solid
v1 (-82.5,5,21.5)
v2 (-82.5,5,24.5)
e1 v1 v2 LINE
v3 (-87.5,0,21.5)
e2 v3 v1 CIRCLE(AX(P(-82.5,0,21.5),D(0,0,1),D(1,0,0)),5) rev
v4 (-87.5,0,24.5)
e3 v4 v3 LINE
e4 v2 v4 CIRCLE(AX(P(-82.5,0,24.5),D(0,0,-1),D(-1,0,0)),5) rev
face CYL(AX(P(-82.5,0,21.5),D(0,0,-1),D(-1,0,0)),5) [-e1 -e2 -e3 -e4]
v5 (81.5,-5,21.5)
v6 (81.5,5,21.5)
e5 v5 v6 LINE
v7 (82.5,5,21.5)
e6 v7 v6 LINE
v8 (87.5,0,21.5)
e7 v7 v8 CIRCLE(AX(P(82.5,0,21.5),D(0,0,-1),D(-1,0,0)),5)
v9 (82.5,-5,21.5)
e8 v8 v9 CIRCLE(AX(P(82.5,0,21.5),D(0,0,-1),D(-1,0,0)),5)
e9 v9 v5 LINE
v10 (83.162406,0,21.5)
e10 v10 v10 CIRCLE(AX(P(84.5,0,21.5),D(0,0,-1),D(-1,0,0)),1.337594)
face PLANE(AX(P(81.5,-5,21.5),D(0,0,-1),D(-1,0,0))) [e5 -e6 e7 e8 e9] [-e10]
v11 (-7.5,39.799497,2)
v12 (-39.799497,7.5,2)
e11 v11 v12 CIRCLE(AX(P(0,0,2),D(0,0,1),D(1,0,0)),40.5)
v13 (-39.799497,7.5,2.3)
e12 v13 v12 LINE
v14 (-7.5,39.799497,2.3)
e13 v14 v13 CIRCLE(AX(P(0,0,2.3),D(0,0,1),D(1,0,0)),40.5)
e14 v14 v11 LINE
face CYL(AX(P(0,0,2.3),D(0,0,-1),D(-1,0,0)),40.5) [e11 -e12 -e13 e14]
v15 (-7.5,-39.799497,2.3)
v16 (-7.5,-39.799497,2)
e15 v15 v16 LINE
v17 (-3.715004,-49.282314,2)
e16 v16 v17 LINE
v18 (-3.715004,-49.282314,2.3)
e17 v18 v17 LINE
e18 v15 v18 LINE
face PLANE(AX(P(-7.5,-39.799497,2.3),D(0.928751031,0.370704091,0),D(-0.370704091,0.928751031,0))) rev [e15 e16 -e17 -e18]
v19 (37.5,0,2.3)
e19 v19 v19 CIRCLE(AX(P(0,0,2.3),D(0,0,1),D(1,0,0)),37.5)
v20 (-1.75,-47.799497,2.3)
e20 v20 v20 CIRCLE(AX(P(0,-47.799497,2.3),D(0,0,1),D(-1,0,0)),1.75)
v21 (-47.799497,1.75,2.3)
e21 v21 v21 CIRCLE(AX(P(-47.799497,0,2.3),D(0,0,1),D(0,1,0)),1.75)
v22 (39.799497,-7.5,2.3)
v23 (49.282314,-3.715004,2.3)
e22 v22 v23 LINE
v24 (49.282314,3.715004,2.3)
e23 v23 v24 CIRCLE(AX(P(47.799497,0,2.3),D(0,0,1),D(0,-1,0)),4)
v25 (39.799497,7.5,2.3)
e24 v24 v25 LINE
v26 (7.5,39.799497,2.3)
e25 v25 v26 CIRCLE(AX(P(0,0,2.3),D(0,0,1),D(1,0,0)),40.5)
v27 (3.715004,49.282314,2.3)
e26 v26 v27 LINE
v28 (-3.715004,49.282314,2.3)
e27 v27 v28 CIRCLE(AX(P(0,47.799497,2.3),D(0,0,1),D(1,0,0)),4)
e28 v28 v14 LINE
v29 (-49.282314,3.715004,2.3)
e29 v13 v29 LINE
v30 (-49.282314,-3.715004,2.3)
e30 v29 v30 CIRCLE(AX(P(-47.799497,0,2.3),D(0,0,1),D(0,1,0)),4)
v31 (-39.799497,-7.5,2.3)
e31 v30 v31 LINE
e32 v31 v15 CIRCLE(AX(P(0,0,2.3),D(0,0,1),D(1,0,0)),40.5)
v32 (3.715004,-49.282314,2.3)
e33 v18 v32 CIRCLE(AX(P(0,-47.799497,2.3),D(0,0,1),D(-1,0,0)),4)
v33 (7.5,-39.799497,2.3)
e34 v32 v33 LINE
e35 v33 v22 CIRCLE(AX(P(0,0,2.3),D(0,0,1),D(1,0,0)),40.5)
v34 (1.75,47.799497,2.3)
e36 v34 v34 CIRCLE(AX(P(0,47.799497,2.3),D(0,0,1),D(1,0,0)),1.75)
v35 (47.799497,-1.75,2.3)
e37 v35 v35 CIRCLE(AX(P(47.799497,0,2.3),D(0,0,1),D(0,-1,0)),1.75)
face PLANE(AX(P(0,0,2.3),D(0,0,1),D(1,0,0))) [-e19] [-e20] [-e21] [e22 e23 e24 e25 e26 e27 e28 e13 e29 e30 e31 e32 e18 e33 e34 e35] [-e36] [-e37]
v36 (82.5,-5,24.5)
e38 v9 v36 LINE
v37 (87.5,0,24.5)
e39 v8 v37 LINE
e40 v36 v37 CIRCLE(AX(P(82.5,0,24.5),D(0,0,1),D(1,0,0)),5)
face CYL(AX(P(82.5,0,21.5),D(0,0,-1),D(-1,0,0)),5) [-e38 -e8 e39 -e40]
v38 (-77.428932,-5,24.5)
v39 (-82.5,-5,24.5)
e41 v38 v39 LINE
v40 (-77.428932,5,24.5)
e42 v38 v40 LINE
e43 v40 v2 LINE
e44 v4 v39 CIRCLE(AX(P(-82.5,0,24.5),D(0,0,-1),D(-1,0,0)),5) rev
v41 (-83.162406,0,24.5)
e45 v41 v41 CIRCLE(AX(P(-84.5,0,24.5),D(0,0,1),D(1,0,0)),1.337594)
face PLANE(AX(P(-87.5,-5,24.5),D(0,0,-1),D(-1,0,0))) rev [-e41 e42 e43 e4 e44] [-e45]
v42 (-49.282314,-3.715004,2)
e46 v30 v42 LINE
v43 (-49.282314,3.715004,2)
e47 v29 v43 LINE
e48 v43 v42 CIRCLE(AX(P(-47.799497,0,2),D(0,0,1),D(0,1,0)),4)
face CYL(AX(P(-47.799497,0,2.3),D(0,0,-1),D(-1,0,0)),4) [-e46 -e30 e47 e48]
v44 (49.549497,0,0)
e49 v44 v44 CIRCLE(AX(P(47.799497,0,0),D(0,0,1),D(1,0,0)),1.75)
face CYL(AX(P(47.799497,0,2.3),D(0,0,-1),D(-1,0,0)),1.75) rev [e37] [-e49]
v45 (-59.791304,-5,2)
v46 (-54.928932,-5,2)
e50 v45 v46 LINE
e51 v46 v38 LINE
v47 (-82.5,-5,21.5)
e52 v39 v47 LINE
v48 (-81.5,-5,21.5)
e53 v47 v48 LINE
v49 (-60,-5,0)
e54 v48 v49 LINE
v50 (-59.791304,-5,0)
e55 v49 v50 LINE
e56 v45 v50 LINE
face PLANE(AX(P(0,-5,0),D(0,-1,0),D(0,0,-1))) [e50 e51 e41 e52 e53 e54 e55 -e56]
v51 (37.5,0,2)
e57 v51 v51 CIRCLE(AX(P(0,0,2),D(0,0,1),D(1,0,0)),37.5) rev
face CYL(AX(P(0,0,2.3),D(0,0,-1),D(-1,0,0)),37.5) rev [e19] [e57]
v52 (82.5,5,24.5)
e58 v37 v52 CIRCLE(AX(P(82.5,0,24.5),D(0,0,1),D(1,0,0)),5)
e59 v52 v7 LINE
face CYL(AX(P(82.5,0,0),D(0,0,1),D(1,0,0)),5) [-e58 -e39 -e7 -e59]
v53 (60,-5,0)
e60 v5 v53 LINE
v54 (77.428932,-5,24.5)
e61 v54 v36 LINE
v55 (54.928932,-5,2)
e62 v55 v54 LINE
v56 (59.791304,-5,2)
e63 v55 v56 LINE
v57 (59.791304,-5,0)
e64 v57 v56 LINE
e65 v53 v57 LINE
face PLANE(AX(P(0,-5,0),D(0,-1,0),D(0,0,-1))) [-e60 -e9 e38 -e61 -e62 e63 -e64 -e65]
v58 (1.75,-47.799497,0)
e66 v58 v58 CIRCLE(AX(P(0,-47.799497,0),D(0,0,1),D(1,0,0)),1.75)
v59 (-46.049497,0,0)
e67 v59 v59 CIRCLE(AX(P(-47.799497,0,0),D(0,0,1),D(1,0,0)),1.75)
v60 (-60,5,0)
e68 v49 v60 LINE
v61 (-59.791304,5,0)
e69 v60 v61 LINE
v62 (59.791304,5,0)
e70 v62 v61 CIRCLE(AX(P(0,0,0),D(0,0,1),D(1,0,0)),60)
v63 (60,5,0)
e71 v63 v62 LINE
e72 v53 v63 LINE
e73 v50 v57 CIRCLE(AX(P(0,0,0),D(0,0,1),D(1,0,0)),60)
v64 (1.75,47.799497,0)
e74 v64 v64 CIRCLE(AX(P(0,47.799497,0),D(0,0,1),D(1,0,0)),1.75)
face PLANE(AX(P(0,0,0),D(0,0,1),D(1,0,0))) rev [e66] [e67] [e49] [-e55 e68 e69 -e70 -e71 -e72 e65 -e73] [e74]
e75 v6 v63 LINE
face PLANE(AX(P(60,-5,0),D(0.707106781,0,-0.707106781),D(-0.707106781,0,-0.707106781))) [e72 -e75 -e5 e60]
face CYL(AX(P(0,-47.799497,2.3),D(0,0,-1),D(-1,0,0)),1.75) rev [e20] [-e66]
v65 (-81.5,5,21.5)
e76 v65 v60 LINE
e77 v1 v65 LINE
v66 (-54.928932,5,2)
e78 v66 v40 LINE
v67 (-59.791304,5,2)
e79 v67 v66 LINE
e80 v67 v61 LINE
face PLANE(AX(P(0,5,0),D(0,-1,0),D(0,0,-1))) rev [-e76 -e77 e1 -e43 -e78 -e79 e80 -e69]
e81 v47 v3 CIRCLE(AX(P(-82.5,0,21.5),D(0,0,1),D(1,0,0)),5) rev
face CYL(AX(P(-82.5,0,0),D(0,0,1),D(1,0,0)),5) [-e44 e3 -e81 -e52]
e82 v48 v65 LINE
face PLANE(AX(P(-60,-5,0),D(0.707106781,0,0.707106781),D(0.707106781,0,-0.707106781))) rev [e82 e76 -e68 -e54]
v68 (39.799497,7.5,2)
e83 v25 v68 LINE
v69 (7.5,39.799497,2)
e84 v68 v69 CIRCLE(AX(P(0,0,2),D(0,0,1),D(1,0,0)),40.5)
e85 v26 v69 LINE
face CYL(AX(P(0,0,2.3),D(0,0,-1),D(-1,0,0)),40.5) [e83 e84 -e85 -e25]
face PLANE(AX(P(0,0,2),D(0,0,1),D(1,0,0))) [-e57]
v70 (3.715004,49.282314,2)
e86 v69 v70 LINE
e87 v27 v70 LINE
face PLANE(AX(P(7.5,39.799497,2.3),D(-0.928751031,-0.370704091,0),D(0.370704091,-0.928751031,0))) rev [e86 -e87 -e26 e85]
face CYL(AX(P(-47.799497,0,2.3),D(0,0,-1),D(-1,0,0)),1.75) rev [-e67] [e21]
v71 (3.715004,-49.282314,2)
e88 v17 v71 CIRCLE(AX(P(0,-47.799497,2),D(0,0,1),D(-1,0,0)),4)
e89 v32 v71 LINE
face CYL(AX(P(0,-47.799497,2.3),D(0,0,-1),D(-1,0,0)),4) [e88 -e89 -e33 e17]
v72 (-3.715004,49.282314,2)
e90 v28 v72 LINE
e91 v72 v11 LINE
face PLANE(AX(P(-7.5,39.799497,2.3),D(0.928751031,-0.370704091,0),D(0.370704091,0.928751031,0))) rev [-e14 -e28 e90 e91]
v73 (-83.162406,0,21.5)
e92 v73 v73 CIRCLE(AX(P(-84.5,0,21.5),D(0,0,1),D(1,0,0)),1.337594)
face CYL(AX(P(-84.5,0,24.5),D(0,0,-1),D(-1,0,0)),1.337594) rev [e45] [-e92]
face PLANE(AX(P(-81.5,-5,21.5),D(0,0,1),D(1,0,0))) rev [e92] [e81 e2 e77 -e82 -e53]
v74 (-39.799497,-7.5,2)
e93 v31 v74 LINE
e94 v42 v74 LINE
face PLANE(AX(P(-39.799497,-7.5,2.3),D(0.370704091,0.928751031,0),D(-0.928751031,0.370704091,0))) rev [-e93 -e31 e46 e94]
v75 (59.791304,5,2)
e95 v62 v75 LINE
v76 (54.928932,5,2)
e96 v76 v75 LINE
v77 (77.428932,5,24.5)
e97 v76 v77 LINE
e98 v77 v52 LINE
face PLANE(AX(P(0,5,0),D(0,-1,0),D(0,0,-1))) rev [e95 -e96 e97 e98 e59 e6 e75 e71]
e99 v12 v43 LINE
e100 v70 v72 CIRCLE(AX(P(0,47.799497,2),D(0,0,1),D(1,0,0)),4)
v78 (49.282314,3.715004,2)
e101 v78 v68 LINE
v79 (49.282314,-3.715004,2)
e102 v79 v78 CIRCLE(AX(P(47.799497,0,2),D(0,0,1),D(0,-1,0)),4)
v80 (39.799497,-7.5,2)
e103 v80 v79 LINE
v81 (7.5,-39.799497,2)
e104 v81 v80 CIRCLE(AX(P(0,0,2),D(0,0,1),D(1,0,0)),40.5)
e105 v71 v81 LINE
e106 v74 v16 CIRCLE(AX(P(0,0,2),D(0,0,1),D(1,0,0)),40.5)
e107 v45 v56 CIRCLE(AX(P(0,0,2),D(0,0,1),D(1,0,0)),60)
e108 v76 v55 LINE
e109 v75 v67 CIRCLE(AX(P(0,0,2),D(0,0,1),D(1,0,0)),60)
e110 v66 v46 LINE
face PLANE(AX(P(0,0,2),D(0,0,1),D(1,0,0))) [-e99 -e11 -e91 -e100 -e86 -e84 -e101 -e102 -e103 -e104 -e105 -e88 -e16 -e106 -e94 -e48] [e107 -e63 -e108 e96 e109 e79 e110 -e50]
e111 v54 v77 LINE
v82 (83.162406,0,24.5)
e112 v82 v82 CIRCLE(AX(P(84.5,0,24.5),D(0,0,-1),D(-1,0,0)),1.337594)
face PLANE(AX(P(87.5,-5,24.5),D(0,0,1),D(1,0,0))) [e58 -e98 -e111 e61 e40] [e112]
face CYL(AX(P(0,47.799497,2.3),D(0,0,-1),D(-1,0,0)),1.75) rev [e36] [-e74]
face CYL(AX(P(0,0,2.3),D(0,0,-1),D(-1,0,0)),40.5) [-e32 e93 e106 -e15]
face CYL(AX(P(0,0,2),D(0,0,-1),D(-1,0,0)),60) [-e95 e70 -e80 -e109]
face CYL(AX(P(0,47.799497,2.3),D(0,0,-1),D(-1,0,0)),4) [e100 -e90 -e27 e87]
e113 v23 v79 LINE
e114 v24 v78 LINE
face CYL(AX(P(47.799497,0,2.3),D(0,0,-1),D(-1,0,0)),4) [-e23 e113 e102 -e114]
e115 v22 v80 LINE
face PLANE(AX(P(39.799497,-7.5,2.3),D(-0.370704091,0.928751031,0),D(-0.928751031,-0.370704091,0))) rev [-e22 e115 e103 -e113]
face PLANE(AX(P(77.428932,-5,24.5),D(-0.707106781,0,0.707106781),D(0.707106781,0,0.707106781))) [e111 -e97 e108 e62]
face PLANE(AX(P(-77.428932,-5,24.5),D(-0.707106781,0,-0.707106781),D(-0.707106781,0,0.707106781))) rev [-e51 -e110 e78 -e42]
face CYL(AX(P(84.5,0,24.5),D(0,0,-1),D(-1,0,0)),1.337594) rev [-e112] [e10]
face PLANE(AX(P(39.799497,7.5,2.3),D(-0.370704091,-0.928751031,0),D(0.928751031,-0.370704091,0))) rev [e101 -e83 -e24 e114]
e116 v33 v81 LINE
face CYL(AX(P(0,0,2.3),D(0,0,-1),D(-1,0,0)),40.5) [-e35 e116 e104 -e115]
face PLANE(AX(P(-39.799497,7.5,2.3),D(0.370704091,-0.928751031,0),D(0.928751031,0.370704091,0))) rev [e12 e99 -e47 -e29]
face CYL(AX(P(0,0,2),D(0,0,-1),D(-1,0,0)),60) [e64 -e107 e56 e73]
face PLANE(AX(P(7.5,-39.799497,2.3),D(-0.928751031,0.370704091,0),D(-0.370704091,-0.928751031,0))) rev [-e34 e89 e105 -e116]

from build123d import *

# Parameters (mm, degrees)
SKETCH1_R            = 60
BOSS_EXTRUDE1_DEPTH  = 2
SKETCH4_R            = 40.5
SKETCH4_R_2          = 37.5
BOSS_EXTRUDE4_DEPTH  = 0.3
SKETCH5_R            = 1.75
BOSS_EXTRUDE5_DEPTH  = 0.3
CIRPATTERN1_COUNT    = 4
SKETCH6_R            = 1.75
CUT_EXTRUDE1_DEPTH   = 85.876380696
BOSS_EXTRUDE6_DEPTH  = 5
SKETCH8_R            = 1.337594407
CUT_EXTRUDE2_DEPTH   = 109.252020766
FILLET1_R            = 5
FILLET1_OF_MIRROR1_R = 5


with BuildPart() as part:
    # Sketch1 → Boss-Extrude1 (new body)
    with BuildSketch(Plane.XY):
        Circle(SKETCH1_R)
    extrude(amount=BOSS_EXTRUDE1_DEPTH)

    # Sketch4 → Boss-Extrude4 (add)
    with BuildSketch(Plane.XY.offset(2)):
        Circle(SKETCH4_R)
        Circle(SKETCH4_R_2, mode=Mode.SUBTRACT)
    extrude(amount=BOSS_EXTRUDE4_DEPTH)

    # Sketch5 → Boss-Extrude5 (add)
    with BuildSketch(Plane.XY.offset(2)):
        with BuildLine():
            Line((-7.5, 39.799497484), (7.5, 39.799497484))
            Line((7.5, 39.799497484), (3.715004122, 49.282313849))
            ThreePointArc((3.715004122, 49.282313849), (0, 51.799497484), (-3.715004122, 49.282313849))
            Line((-3.715004122, 49.282313849), (-7.5, 39.799497484))
        make_face()
        with Locations((0, 47.799497484)):
            Circle(SKETCH5_R, mode=Mode.SUBTRACT)
    boss_extrude5 = extrude(amount=BOSS_EXTRUDE5_DEPTH)

    # CirPattern1: Boss-Extrude5 ×4 about axis
    cirpattern1_axis = Axis((0, 0, 0), (0, 0, 1))
    for i in range(1, CIRPATTERN1_COUNT):
        add(boss_extrude5.rotate(cirpattern1_axis, i * 360 / CIRPATTERN1_COUNT))

    # Sketch6 → Cut-Extrude1 (cut, through all)
    with BuildSketch(Plane.XY.offset(2)):
        with Locations((0, 47.799497484)):
            Circle(SKETCH6_R)
        with Locations(Location((-47.799497484, 0, 0), (0, 0, 90))):
            Circle(SKETCH6_R)
        with Locations(Location((47.799497484, 0, 0), (0, 0, 270))):
            Circle(SKETCH6_R)
        with Locations(Location((0, -47.799497484, 0), (0, 0, 180))):
            Circle(SKETCH6_R)
    extrude(amount=-CUT_EXTRUDE1_DEPTH, mode=Mode.SUBTRACT)

    # Sketch7 → Boss-Extrude6 (add, symmetric)
    with BuildSketch(Plane(origin=(0, 0, 0), x_dir=(1, 0, 0), z_dir=(0, 1, 0))):
        Polygon((60, 0), (81.5, -21.5), (87.5, -21.5), (87.5, -24.5), (77.428932188, -24.5), (52.928932188, 0), align=None)
    boss_extrude6 = extrude(amount=BOSS_EXTRUDE6_DEPTH, both=True)

    # Sketch8 → Cut-Extrude2 (cut, through all)
    with BuildSketch(Plane(origin=(0, 0, 21.5), x_dir=(-1, 0, 0), z_dir=(0, 0, -1))):
        with Locations((-84.5, 0)):
            Circle(SKETCH8_R)
    cut_extrude2 = extrude(amount=-CUT_EXTRUDE2_DEPTH, mode=Mode.SUBTRACT)

    # Fillet1
    fillet1_edges = [part.edges().sort_by_distance(p)[0] for p in [
        (87.5, -5, 23),
        (87.5, 5, 23),
    ]]
    fillet(fillet1_edges, radius=FILLET1_R - 0.0001)  # a hair under: the kernel refuses the full size

    # Mirror1: Boss-Extrude6, Cut-Extrude2 across plane
    add(boss_extrude6.mirror(Plane(origin=(0, 0, 0), x_dir=(0, 0, 1), z_dir=(1, 0, 0))))
    add(cut_extrude2.mirror(Plane(origin=(0, 0, 0), x_dir=(0, 0, 1), z_dir=(1, 0, 0))), mode=Mode.SUBTRACT)

    # Fillet1 of Mirror1
    fillet1_of_mirror1_edges = [part.edges().sort_by_distance(p)[0] for p in [
        (-87.5, -5, 23),
        (-87.5, 5, 23),
    ]]
    fillet(fillet1_of_mirror1_edges, radius=FILLET1_OF_MIRROR1_R - 0.0001)  # a hair under: the kernel refuses the full size


solid = part.part
